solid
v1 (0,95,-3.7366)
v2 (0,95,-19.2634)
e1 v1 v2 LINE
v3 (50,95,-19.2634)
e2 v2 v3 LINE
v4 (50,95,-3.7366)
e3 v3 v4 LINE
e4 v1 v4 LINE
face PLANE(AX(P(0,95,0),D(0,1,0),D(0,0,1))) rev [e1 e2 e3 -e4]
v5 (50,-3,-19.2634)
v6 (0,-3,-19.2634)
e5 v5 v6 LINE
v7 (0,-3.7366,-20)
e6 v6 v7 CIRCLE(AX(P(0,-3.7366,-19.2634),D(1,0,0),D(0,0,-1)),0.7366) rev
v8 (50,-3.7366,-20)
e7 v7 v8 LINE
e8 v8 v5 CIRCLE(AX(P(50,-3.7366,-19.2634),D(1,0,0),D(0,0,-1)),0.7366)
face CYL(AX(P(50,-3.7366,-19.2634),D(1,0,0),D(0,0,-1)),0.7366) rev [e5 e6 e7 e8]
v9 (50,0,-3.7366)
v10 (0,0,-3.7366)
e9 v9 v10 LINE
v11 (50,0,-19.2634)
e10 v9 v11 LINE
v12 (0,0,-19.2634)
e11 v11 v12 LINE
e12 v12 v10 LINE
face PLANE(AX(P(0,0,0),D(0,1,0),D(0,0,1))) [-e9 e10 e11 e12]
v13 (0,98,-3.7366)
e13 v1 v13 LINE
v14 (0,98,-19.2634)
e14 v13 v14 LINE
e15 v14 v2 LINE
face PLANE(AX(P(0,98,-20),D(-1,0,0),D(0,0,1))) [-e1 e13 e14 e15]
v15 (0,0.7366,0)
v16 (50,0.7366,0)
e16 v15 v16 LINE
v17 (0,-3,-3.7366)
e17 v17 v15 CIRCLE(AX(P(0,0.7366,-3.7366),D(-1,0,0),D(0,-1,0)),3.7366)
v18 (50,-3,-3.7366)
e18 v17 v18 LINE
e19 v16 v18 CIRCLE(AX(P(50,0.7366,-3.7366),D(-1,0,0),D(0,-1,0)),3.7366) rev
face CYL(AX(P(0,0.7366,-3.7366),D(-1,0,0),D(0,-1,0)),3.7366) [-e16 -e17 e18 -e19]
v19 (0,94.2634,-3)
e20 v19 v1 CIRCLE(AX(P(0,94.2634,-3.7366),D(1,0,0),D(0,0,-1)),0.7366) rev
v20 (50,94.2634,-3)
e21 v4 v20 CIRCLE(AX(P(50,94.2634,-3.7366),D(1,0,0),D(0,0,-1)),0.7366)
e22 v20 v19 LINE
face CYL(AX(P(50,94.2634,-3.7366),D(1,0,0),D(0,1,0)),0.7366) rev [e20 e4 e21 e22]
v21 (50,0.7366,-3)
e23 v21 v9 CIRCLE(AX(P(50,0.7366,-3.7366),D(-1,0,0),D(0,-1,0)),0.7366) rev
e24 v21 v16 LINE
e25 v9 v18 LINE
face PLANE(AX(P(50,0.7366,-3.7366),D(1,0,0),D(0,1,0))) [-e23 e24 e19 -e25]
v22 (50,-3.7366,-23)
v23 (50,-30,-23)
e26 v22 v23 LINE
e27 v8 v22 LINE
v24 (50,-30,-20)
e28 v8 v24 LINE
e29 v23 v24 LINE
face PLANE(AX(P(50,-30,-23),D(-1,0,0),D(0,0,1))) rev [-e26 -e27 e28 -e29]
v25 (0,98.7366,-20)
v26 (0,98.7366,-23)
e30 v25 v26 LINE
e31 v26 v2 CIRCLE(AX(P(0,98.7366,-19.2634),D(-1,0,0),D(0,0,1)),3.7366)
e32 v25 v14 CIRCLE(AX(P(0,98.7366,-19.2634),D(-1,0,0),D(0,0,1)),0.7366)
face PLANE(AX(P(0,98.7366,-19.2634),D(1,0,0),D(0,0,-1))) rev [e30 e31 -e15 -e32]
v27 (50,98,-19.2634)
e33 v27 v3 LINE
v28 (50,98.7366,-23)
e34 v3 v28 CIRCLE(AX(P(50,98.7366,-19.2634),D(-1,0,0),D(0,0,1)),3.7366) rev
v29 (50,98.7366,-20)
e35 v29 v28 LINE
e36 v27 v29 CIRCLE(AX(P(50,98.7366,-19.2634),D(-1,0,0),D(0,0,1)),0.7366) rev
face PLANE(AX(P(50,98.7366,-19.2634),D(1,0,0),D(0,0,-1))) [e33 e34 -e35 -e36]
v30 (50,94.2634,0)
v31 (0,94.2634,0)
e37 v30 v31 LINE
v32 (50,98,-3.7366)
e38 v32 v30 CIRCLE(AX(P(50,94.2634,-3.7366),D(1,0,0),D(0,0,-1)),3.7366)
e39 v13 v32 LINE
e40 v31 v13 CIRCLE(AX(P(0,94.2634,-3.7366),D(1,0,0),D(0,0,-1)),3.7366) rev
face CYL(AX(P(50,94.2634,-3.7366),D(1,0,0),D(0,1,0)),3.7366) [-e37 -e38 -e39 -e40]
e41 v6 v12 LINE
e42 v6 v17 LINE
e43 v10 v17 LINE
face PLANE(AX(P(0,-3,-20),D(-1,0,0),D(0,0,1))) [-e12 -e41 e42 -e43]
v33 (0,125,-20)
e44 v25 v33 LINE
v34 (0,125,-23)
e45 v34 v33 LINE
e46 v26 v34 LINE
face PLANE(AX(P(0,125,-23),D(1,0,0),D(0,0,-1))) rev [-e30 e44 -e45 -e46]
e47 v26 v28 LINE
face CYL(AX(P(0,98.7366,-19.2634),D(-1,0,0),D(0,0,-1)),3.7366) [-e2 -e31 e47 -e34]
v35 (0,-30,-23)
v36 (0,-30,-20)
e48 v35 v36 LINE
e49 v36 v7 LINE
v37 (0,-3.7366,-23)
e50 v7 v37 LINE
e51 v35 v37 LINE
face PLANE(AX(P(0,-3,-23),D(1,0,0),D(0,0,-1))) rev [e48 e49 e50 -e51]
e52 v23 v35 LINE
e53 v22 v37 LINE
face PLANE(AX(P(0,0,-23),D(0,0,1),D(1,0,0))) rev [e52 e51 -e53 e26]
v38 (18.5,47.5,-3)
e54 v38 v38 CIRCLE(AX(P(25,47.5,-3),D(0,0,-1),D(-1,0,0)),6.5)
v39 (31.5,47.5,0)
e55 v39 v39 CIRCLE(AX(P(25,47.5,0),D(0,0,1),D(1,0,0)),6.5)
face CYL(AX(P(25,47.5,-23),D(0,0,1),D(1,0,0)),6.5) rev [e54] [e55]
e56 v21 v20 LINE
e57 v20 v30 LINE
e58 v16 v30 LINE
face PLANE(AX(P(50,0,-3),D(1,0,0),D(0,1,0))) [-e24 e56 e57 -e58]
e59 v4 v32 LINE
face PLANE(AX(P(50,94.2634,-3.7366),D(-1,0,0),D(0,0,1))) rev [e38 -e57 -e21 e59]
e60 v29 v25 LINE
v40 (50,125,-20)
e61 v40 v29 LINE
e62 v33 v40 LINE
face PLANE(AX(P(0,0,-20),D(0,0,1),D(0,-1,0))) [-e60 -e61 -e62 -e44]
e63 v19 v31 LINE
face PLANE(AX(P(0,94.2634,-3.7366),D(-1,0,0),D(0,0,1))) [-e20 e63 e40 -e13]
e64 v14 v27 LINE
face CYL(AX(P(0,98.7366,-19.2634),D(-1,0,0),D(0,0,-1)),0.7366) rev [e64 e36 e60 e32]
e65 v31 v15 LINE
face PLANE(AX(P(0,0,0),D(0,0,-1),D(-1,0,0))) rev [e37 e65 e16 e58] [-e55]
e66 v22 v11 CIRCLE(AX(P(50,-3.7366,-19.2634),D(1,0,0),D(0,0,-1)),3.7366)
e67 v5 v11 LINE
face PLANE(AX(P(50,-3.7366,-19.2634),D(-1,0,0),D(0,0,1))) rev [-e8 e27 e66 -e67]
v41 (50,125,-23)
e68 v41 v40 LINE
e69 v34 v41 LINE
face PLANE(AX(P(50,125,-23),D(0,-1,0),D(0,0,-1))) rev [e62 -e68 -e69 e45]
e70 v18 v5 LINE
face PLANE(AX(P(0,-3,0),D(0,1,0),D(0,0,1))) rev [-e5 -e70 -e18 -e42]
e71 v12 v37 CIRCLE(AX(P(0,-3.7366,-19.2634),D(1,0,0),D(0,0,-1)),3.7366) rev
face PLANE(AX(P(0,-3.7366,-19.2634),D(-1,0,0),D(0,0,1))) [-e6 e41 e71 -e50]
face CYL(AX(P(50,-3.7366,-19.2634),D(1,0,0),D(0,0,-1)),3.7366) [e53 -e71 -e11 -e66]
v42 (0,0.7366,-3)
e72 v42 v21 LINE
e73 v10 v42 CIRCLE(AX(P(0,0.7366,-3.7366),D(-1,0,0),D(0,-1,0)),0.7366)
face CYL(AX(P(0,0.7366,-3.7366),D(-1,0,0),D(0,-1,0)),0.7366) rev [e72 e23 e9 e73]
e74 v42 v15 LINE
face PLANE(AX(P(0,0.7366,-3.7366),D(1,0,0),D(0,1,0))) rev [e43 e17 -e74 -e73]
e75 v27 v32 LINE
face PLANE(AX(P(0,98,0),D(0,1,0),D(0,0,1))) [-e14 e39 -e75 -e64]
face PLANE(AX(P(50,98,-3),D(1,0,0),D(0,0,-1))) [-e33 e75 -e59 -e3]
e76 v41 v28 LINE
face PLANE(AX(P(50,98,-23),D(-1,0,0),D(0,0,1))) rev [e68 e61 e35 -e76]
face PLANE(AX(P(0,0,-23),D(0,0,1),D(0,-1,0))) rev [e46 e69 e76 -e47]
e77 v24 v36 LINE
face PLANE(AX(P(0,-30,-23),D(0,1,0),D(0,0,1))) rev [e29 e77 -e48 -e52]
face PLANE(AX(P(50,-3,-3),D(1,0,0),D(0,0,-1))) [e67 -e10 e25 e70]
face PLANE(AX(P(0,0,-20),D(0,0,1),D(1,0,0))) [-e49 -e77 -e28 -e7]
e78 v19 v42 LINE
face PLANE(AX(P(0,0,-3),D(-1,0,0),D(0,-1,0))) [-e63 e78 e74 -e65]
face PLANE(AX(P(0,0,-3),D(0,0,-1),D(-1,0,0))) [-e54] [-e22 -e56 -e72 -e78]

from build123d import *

# Parameters (mm, degrees)
SKETCH_1_W                         = 50
SKETCH_1_H                         = 95
SM_BASE_FLANGE_1_DEPTH             = 3
SM_EDGE_FLANGE_1_STRIP_W           = 13.4732
SM_EDGE_FLANGE_1_STRIP_H           = 3
SM_EDGE_FLANGE_1_STRIP_CUT_DEPTH   = 50
SM_EDGE_FLANGE_1_STRIP_2_W         = 13.4732
SM_EDGE_FLANGE_1_STRIP_2_H         = 3
SM_EDGE_FLANGE_1_STRIP_CUT_2_DEPTH = 50
SM_EDGE_FLANGE_1_DEPTH             = 50
SM_EDGE_FLANGE_1_BEND_DEPTH        = 50
SM_EDGE_FLANGE_2_STRIP_W           = 13.4732
SM_EDGE_FLANGE_2_STRIP_H           = 3
SM_EDGE_FLANGE_2_STRIP_CUT_DEPTH   = 50
SM_EDGE_FLANGE_2_STRIP_2_W         = 13.4732
SM_EDGE_FLANGE_2_STRIP_2_H         = 3
SM_EDGE_FLANGE_2_STRIP_CUT_2_DEPTH = 50
SM_EDGE_FLANGE_2_DEPTH             = 50
SM_EDGE_FLANGE_2_BEND_DEPTH        = 50
SKETCH_18_R                        = 6.5
CUT_EXTRUDE_1_DEPTH                = 137.579647093


# Sheet-metal steps are written as plain solids
with BuildPart() as part:
    # Sketch 1 → 基体-法兰1 (new body)
    with BuildSketch(Plane.XY):
        with Locations((25, 47.5)):
            Rectangle(SKETCH_1_W, SKETCH_1_H)
    extrude(amount=-SM_BASE_FLANGE_1_DEPTH)

    # 边线-法兰1 strip (across the edge) → 边线-法兰1 strip cut (cut)
    with BuildSketch(Plane(origin=(0, 95, -3), x_dir=(0, -1, 0), z_dir=(1, 0, 0))):
        with Locations((-6, -1.5)):
            Rectangle(SM_EDGE_FLANGE_1_STRIP_W, SM_EDGE_FLANGE_1_STRIP_H)
    extrude(amount=SM_EDGE_FLANGE_1_STRIP_CUT_DEPTH, mode=Mode.SUBTRACT)

    # 边线-法兰1 strip 2 (across the edge) → 边线-法兰1 strip cut 2 (cut)
    with BuildSketch(Plane(origin=(50, 0, -3), x_dir=(0, 1, 0), z_dir=(-1, 0, 0))):
        with Locations((-6, -1.5)):
            Rectangle(SM_EDGE_FLANGE_1_STRIP_2_W, SM_EDGE_FLANGE_1_STRIP_2_H)
    extrude(amount=SM_EDGE_FLANGE_1_STRIP_CUT_2_DEPTH, mode=Mode.SUBTRACT)

    # 边线-法兰1 section (across the edge) → 边线-法兰1 (add)
    with BuildSketch(Plane(origin=(0, 95, -3), x_dir=(0, -1, 0), z_dir=(1, 0, 0))):
        with BuildLine():
            Line((-3, 0.7366), (-3, 17))
            Line((-3, 17), (0, 17))
            Line((0, 17), (0, 0.7366))
            ThreePointArc((0, 0.7366), (0.215745145, 0.215745145), (0.7366, 0))
            Line((0.7366, 0), (0.7366, -3))
            ThreePointArc((0.7366, -3), (-1.905575199, -1.905575199), (-3, 0.7366))
        make_face()
    extrude(amount=SM_EDGE_FLANGE_1_DEPTH)

    # 边线-法兰1 section 2 (across the edge) → 边线-法兰1 bend (add)
    with BuildSketch(Plane(origin=(50, 0, -3), x_dir=(0, 1, 0), z_dir=(-1, 0, 0))):
        with BuildLine():
            Line((-3, 0.7366), (-3, 17))
            Line((-3, 17), (0, 17))
            Line((0, 17), (0, 0.7366))
            ThreePointArc((0, 0.7366), (0.215745145, 0.215745145), (0.7366, 0))
            Line((0.7366, 0), (0.7366, -3))
            ThreePointArc((0.7366, -3), (-1.905575199, -1.905575199), (-3, 0.7366))
        make_face()
    extrude(amount=SM_EDGE_FLANGE_1_BEND_DEPTH)

    # 边线-法兰2 strip (across the edge) → 边线-法兰2 strip cut (cut)
    with BuildSketch(Plane(origin=(0, -3, -20), x_dir=(0, 0, 1), z_dir=(1, 0, 0))):
        with Locations((-6, -1.5)):
            Rectangle(SM_EDGE_FLANGE_2_STRIP_W, SM_EDGE_FLANGE_2_STRIP_H)
    extrude(amount=SM_EDGE_FLANGE_2_STRIP_CUT_DEPTH, mode=Mode.SUBTRACT)

    # 边线-法兰2 strip 2 (across the edge) → 边线-法兰2 strip cut 2 (cut)
    with BuildSketch(Plane(origin=(50, 98, -20), x_dir=(0, 0, 1), z_dir=(-1, 0, 0))):
        with Locations((-6, -1.5)):
            Rectangle(SM_EDGE_FLANGE_2_STRIP_2_W, SM_EDGE_FLANGE_2_STRIP_2_H)
    extrude(amount=SM_EDGE_FLANGE_2_STRIP_CUT_2_DEPTH, mode=Mode.SUBTRACT)

    # 边线-法兰2 section (across the edge) → 边线-法兰2 (add)
    with BuildSketch(Plane(origin=(0, -3, -20), x_dir=(0, 0, 1), z_dir=(1, 0, 0))):
        with BuildLine():
            Line((-3, 0.7366), (-3, 27))
            Line((-3, 27), (0, 27))
            Line((0, 27), (0, 0.7366))
            ThreePointArc((0, 0.7366), (0.215745145, 0.215745145), (0.7366, 0))
            Line((0.7366, 0), (0.7366, -3))
            ThreePointArc((0.7366, -3), (-1.905575199, -1.905575199), (-3, 0.7366))
        make_face()
    extrude(amount=SM_EDGE_FLANGE_2_DEPTH)

    # 边线-法兰2 section 2 (across the edge) → 边线-法兰2 bend (add)
    with BuildSketch(Plane(origin=(50, 98, -20), x_dir=(0, 0, 1), z_dir=(-1, 0, 0))):
        with BuildLine():
            Line((-3, 0.7366), (-3, 27))
            Line((-3, 27), (0, 27))
            Line((0, 27), (0, 0.7366))
            ThreePointArc((0, 0.7366), (0.215745145, 0.215745145), (0.7366, 0))
            Line((0.7366, 0), (0.7366, -3))
            ThreePointArc((0.7366, -3), (-1.905575199, -1.905575199), (-3, 0.7366))
        make_face()
    extrude(amount=SM_EDGE_FLANGE_2_BEND_DEPTH)

    # 草图18 → 切除-拉伸1 (cut, through all)
    with BuildSketch(Plane.XY):
        with Locations((25, 47.5)):
            Circle(SKETCH_18_R)
    extrude(amount=-CUT_EXTRUDE_1_DEPTH, mode=Mode.SUBTRACT)


solid = part.part
